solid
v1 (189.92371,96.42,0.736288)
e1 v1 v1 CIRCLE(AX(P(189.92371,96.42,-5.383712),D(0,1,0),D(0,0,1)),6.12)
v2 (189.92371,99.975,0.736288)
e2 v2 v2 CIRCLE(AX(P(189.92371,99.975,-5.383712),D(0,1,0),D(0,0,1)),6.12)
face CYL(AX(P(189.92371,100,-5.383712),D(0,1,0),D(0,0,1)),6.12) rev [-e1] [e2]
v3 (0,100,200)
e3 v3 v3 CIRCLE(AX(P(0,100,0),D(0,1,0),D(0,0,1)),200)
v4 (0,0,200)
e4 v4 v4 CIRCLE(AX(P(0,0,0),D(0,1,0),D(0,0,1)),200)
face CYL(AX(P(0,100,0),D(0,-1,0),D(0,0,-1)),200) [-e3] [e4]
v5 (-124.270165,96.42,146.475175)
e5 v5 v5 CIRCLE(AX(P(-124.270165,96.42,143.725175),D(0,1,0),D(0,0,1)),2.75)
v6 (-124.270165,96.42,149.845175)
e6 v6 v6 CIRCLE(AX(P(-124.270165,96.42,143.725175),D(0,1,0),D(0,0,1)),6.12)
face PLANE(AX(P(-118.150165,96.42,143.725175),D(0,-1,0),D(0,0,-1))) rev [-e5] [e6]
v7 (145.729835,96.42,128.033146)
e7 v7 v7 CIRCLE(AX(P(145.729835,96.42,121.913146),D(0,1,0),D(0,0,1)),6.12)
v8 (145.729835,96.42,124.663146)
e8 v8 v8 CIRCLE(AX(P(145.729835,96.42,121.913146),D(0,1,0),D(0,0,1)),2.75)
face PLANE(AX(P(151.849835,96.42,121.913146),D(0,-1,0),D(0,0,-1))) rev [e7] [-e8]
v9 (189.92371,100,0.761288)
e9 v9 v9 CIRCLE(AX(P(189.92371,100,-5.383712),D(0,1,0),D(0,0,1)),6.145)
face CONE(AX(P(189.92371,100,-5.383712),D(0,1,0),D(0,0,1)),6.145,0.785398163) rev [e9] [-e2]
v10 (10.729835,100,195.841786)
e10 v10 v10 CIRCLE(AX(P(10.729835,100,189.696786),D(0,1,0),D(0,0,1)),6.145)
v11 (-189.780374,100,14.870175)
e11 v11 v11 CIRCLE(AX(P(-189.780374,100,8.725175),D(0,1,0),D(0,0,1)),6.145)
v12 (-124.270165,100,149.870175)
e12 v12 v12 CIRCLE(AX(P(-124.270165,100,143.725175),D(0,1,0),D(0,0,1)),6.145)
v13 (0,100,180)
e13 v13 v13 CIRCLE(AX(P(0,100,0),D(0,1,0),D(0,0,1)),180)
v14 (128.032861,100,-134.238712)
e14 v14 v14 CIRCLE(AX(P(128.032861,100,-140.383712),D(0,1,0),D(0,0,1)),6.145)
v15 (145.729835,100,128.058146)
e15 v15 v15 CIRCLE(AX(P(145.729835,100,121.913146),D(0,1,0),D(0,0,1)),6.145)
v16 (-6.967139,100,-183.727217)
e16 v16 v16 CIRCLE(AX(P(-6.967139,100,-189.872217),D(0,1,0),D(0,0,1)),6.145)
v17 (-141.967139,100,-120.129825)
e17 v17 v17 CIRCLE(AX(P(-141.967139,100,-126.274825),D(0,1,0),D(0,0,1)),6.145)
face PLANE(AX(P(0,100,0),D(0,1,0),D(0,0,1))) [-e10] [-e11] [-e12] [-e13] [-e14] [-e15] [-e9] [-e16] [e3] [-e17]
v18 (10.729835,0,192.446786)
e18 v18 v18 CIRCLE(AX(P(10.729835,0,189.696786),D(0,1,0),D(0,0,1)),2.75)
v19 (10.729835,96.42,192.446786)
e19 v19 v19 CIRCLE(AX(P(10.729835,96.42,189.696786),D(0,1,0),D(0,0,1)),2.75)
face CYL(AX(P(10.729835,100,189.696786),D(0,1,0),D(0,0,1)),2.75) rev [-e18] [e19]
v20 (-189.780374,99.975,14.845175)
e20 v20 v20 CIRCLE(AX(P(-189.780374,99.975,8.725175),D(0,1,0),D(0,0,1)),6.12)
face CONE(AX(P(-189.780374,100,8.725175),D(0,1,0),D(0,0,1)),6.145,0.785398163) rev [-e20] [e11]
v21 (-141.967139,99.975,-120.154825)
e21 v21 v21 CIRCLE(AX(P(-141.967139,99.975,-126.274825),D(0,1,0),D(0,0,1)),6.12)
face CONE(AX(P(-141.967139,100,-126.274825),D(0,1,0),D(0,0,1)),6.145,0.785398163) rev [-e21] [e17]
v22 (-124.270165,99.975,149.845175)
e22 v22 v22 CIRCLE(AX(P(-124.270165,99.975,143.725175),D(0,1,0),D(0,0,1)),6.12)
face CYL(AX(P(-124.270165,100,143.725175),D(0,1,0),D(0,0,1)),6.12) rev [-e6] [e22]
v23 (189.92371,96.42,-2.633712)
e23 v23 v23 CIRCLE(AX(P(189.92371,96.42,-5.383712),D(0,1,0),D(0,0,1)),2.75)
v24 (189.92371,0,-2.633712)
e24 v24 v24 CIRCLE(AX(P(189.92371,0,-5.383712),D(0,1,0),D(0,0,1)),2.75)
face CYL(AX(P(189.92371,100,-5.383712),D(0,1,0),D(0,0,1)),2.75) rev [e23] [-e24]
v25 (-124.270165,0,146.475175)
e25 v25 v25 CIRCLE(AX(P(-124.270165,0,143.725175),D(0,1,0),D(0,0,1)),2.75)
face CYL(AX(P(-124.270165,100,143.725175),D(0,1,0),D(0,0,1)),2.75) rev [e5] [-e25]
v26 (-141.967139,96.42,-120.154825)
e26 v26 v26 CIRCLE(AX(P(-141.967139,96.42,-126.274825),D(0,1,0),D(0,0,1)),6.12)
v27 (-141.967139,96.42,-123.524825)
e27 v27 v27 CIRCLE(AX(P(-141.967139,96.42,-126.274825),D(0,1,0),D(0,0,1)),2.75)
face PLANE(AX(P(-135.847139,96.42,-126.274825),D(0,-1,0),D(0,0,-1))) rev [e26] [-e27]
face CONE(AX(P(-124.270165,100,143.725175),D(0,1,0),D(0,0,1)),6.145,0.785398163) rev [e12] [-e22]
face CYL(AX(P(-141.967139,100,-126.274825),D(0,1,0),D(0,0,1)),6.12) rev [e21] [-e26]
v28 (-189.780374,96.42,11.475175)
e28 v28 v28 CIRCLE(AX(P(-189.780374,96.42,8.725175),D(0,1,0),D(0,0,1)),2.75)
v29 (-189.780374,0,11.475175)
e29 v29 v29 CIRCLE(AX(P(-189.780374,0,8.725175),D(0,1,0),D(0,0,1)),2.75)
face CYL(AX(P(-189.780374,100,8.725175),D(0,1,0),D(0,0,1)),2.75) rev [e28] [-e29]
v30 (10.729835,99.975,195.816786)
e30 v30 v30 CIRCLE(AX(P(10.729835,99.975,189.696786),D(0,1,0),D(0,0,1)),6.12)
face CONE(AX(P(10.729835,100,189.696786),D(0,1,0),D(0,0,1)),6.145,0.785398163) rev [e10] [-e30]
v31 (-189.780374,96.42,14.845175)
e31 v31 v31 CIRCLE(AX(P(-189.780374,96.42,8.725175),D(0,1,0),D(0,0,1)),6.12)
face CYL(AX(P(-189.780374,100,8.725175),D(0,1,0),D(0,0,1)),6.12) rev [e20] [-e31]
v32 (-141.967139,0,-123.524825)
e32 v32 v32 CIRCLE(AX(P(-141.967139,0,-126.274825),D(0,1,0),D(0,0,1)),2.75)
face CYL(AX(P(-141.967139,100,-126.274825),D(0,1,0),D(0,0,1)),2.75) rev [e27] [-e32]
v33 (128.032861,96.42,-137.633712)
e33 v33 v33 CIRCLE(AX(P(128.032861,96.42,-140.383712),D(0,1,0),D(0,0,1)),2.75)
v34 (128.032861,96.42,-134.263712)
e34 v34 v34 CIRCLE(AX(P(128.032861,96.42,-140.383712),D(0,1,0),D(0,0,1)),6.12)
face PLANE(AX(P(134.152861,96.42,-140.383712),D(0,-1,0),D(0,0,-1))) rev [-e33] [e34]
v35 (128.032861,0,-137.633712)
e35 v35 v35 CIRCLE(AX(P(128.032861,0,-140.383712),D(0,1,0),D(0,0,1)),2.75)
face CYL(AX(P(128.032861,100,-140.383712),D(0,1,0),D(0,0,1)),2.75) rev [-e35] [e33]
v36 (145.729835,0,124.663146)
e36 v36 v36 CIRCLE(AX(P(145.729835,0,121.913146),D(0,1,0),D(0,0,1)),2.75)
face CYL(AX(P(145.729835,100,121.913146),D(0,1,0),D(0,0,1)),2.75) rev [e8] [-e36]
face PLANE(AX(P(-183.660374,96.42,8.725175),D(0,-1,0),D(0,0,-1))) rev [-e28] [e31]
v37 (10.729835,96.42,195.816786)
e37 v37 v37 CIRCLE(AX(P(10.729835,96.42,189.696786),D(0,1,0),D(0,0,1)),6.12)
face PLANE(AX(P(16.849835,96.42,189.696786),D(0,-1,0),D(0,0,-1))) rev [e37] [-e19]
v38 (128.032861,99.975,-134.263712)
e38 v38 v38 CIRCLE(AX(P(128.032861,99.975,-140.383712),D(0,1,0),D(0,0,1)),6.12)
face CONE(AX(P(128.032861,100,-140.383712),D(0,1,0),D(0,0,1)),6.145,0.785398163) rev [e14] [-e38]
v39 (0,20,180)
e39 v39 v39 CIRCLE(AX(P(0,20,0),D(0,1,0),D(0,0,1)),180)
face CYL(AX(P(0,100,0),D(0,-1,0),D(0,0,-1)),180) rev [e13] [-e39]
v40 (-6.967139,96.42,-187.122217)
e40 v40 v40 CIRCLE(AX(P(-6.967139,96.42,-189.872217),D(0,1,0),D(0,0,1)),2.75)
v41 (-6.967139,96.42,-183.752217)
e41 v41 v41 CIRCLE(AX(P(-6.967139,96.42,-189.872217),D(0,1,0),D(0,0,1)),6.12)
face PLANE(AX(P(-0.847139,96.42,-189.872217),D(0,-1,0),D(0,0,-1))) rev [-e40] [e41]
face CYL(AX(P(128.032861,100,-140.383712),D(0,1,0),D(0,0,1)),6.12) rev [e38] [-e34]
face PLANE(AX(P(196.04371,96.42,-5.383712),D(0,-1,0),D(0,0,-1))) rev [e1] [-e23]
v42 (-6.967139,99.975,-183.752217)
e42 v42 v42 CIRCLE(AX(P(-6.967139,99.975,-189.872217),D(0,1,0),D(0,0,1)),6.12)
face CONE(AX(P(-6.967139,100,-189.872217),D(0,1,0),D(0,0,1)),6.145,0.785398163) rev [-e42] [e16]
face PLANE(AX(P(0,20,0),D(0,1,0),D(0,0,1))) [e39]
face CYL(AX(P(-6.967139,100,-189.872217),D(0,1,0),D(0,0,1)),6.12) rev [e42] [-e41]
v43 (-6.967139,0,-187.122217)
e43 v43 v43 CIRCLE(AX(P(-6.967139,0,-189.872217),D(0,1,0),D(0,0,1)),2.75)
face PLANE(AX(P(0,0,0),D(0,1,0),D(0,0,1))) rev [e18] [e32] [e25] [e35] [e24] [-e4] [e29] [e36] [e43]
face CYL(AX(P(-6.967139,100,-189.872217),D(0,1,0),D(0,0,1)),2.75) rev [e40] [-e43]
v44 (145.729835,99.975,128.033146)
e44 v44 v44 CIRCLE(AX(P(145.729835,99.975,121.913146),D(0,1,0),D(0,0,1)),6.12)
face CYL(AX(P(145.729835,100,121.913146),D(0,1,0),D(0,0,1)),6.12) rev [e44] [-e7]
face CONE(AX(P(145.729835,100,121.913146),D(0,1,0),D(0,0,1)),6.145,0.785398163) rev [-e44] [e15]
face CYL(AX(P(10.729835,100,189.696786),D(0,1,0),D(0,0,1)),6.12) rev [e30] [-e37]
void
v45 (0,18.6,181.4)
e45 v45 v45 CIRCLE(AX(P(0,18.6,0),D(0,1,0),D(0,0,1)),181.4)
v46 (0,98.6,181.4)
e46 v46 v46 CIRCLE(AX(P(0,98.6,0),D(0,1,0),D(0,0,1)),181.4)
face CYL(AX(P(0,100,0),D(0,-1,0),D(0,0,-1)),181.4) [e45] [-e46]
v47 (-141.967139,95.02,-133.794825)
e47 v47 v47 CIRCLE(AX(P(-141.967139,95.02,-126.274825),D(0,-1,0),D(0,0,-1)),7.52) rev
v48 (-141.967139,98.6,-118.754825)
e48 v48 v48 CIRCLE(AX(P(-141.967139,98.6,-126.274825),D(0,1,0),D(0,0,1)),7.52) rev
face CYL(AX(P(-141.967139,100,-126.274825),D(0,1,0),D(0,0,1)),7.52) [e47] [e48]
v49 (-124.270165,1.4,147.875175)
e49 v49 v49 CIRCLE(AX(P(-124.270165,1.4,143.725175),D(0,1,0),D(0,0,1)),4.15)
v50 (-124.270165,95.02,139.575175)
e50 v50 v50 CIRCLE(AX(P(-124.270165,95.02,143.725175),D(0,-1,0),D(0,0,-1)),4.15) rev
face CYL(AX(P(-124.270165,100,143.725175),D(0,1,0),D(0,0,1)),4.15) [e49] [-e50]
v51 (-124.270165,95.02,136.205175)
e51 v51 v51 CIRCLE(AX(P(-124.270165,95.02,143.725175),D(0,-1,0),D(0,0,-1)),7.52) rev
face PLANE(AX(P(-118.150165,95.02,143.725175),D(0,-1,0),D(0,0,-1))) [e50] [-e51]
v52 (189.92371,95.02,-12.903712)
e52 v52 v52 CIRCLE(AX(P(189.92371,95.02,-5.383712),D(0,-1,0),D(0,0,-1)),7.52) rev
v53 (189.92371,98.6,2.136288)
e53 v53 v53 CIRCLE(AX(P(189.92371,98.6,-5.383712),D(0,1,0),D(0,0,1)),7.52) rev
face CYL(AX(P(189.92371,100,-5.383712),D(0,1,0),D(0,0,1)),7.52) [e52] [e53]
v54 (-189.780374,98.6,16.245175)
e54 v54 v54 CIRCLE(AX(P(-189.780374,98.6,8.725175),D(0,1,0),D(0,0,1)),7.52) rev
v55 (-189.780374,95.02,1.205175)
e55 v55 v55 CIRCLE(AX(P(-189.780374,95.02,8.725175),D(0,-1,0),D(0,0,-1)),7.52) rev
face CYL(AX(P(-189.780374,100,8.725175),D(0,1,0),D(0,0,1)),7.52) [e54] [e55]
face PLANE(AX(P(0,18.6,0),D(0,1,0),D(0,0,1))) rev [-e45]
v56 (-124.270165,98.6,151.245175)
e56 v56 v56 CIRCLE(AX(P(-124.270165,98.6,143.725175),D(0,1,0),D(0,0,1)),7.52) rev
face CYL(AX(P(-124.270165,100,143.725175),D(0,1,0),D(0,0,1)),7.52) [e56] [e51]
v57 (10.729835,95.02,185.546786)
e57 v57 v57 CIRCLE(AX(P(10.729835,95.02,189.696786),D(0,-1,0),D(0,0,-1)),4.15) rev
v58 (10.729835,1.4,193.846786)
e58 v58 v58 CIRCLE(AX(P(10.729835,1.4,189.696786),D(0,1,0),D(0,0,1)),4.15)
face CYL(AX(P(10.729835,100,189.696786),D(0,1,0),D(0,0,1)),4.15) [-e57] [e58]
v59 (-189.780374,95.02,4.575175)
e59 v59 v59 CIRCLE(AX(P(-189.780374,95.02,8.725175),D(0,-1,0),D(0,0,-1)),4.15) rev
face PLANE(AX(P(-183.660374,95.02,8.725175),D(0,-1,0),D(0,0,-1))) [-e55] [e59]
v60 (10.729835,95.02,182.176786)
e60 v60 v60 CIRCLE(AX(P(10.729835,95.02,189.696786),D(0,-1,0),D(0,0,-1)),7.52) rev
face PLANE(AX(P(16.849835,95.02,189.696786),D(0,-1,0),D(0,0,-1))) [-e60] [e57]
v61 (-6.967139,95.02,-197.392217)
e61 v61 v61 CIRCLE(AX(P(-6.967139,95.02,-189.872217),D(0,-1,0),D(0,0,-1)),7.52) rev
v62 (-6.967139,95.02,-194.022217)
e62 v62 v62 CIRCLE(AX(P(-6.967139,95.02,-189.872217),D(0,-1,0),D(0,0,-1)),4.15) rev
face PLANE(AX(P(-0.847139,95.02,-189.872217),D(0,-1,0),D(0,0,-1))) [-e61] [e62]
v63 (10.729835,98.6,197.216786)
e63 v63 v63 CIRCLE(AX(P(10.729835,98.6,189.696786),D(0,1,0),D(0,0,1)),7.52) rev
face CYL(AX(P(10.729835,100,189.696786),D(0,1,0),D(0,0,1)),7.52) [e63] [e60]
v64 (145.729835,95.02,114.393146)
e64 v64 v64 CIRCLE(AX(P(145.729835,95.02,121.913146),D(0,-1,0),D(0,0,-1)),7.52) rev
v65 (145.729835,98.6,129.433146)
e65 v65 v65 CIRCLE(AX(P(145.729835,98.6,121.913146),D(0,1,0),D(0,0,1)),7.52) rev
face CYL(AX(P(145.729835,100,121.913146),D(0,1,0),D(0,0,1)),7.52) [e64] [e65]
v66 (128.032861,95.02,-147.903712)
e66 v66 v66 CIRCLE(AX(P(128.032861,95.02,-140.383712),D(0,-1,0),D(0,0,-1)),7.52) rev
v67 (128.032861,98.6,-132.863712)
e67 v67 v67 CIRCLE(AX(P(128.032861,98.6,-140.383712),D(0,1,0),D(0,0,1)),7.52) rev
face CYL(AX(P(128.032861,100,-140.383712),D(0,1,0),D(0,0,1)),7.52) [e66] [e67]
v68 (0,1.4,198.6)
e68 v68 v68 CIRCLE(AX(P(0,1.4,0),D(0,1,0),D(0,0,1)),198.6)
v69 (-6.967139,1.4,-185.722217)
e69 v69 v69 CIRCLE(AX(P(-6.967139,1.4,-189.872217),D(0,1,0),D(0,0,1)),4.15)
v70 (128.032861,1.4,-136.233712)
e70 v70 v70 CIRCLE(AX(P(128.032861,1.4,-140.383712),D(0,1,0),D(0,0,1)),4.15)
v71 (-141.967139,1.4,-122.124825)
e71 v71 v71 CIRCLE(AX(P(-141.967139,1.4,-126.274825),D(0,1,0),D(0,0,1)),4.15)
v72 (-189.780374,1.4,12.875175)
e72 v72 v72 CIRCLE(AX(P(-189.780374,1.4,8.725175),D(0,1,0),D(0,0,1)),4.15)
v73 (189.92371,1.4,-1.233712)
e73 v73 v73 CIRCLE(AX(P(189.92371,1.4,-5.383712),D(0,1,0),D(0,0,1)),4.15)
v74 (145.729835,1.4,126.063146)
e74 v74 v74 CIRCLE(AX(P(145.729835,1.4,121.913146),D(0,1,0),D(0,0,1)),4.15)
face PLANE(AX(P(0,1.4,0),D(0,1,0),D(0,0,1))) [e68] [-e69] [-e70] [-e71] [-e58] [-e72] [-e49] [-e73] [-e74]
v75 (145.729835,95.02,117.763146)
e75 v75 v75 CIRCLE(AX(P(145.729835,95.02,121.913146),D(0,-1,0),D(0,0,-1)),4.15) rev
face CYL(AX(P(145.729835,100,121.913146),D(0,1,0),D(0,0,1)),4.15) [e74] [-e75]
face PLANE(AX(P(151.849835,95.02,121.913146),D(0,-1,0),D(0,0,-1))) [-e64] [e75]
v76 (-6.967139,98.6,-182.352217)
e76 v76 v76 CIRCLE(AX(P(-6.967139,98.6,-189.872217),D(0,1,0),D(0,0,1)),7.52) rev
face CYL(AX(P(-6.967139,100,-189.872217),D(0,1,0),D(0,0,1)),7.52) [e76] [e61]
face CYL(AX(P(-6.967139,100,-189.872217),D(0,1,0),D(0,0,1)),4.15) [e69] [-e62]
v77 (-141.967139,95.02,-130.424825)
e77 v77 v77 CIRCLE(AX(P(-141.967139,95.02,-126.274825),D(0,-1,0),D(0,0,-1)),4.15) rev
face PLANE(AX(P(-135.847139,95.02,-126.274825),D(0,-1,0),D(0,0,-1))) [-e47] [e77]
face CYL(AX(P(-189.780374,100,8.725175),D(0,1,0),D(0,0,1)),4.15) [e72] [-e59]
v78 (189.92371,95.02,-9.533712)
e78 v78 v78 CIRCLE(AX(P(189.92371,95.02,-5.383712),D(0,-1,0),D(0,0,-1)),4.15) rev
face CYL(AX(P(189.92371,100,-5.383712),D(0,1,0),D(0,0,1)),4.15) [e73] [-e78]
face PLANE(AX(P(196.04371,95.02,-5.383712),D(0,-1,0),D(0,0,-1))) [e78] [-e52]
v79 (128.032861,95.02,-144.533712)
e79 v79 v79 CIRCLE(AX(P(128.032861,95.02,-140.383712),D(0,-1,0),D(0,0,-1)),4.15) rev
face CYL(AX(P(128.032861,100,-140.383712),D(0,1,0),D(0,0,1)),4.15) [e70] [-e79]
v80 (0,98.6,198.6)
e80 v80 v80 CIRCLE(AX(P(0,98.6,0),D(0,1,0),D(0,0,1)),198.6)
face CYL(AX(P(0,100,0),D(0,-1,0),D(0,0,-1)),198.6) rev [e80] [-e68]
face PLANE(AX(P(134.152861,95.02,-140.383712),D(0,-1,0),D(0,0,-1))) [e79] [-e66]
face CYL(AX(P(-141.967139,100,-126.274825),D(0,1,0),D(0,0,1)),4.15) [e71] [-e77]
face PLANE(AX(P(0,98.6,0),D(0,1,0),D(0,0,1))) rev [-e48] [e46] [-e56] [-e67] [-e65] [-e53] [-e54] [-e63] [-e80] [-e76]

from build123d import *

# Parameters (mm, degrees)
SKETCH1_R                              = 200
BOSS_EXTRUDE1_DEPTH                    = 100
SHELL1_T                               = -20
CBORE_FOR_M5_HEX_HEAD_BOLT2_AT_2_COUNT = 2
CBORE_FOR_M5_HEX_HEAD_BOLT2_AT_2_PITCH = 269.81848572
CBORE_FOR_M5_HEX_HEAD_BOLT2_AT_3_COUNT = 2
CBORE_FOR_M5_HEX_HEAD_BOLT2_AT_3_PITCH = 269.928885586
CBORE_FOR_M5_HEX_HEAD_BOLT2_AT_4_COUNT = 2
CBORE_FOR_M5_HEX_HEAD_BOLT2_AT_4_PITCH = 379.981330262
CBORE_FOR_M5_HEX_HEAD_BOLT2_AT_5_COUNT = 2
CBORE_FOR_M5_HEX_HEAD_BOLT2_AT_5_PITCH = 347.169236891
CBORE_FOR_M5_HEX_HEAD_BOLT2_AT_6_COUNT = 2
CBORE_FOR_M5_HEX_HEAD_BOLT2_AT_6_PITCH = 143.784951156
CBORE_FOR_M5_HEX_HEAD_BOLT2_AT_7_COUNT = 2
CBORE_FOR_M5_HEX_HEAD_BOLT2_AT_7_PITCH = 353.620163975
CBORE_FOR_M5_HEX_HEAD_BOLT2_AT_8_COUNT = 2
CBORE_FOR_M5_HEX_HEAD_BOLT2_AT_8_PITCH = 149.23011883
SHELL5_START                           = 1.4
SHELL5_OUTLINE_R                       = 198.6
SHELL5_OUTLINE_R_2                     = 4.15
SHELL5_DEPTH                           = 17.2
SHELL5_START_2                         = 18.6
SHELL5_2_OUTLINE_R                     = 198.6
SHELL5_2_OUTLINE_R_2                   = 181.4
SHELL5_2_OUTLINE_R_3                   = 4.15
SHELL5_2_DEPTH                         = 76.42
SHELL5_START_3                         = 95.02
SHELL5_3_OUTLINE_R                     = 198.6
SHELL5_3_OUTLINE_R_2                   = 7.52
SHELL5_3_OUTLINE_R_3                   = 181.4
SHELL5_3_DEPTH                         = 3.58


# Read off the part's stored shape, not the designer's step: Shell5
with BuildPart() as part:
    # Sketch1 → Boss-Extrude1 (new body)
    with BuildSketch(Plane(origin=(0, 0, 0), x_dir=(1, 0, 0), z_dir=(0, 1, 0))):
        with Locations(Location((0, 0, 0), (0, 0, 270))):
            Circle(SKETCH1_R)
    extrude(amount=BOSS_EXTRUDE1_DEPTH)

    # Shell1
    shell1_openings = [part.faces().sort_by_distance(p)[0] for p in [
        (0, 100, 0),
    ]]
    offset(amount=SHELL1_T, openings=shell1_openings, kind=Kind.INTERSECTION)

    # Sketch8 → CBORE for M5 Hex Head Bolt2 (revolve, cut)
    with BuildSketch(Plane(origin=(-6.967139306, 100, -189.872217478), x_dir=(0, 0, 1), z_dir=(1, 0, 0))):
        Polygon((0, 0), (0, 100), (2.75, 100), (2.75, 3.58), (6.12, 3.58), (6.12, 0.025), (6.145, 0), align=None)
    cbore_for_m5_hex_head_bolt2 = revolve(axis=Axis((-6.967139306, 106.35, -189.872217478), (0, -1, 0)), mode=Mode.SUBTRACT)

    # CBORE for M5 Hex Head Bolt2 at 2: CBORE for M5 Hex Head Bolt2 ×2
    with Locations(*[Vector(0.7297159379092503, 0, 0.6837504295875969) * (i * CBORE_FOR_M5_HEX_HEAD_BOLT2_AT_2_PITCH) for i in range(1, CBORE_FOR_M5_HEX_HEAD_BOLT2_AT_2_COUNT)]):
        add(cbore_for_m5_hex_head_bolt2, mode=Mode.SUBTRACT)

    # CBORE for M5 Hex Head Bolt2 at 3: CBORE for M5 Hex Head Bolt2 ×2
    with Locations(*[Vector(-0.677264437721292, 0, 0.735739683174737) * (i * CBORE_FOR_M5_HEX_HEAD_BOLT2_AT_3_PITCH) for i in range(1, CBORE_FOR_M5_HEX_HEAD_BOLT2_AT_3_COUNT)]):
        add(cbore_for_m5_hex_head_bolt2, mode=Mode.SUBTRACT)

    # CBORE for M5 Hex Head Bolt2 at 4: CBORE for M5 Hex Head Bolt2 ×2
    with Locations(*[Vector(0.04657327234646247, 0, 0.9989148764048628) * (i * CBORE_FOR_M5_HEX_HEAD_BOLT2_AT_4_PITCH) for i in range(1, CBORE_FOR_M5_HEX_HEAD_BOLT2_AT_4_COUNT)]):
        add(cbore_for_m5_hex_head_bolt2, mode=Mode.SUBTRACT)

    # CBORE for M5 Hex Head Bolt2 at 5: CBORE for M5 Hex Head Bolt2 ×2
    with Locations(*[Vector(0.43983440280673813, 0, 0.8980788930309186) * (i * CBORE_FOR_M5_HEX_HEAD_BOLT2_AT_5_PITCH) for i in range(1, CBORE_FOR_M5_HEX_HEAD_BOLT2_AT_5_COUNT)]):
        add(cbore_for_m5_hex_head_bolt2, mode=Mode.SUBTRACT)

    # CBORE for M5 Hex Head Bolt2 at 6: CBORE for M5 Hex Head Bolt2 ×2
    with Locations(*[Vector(0.9389021515469056, 0, 0.344184180084721) * (i * CBORE_FOR_M5_HEX_HEAD_BOLT2_AT_6_PITCH) for i in range(1, CBORE_FOR_M5_HEX_HEAD_BOLT2_AT_6_COUNT)]):
        add(cbore_for_m5_hex_head_bolt2, mode=Mode.SUBTRACT)

    # CBORE for M5 Hex Head Bolt2 at 7: CBORE for M5 Hex Head Bolt2 ×2
    with Locations(*[Vector(-0.33172041068151087, 0, 0.943377744669276) * (i * CBORE_FOR_M5_HEX_HEAD_BOLT2_AT_7_PITCH) for i in range(1, CBORE_FOR_M5_HEX_HEAD_BOLT2_AT_7_COUNT)]):
        add(cbore_for_m5_hex_head_bolt2, mode=Mode.SUBTRACT)

    # CBORE for M5 Hex Head Bolt2 at 8: CBORE for M5 Hex Head Bolt2 ×2
    with Locations(*[Vector(-0.9046431180155808, 0, 0.4261699532194262) * (i * CBORE_FOR_M5_HEX_HEAD_BOLT2_AT_8_PITCH) for i in range(1, CBORE_FOR_M5_HEX_HEAD_BOLT2_AT_8_COUNT)]):
        add(cbore_for_m5_hex_head_bolt2, mode=Mode.SUBTRACT)

    # Shell5 outline → Shell5 (cut)
    with BuildSketch(Plane(origin=(0, 0, 0), x_dir=(1, 0, 0), z_dir=(0, 1, 0)).offset(SHELL5_START)):
        Circle(SHELL5_OUTLINE_R)
        with Locations((-124.270165325, -143.725175283)):
            Circle(SHELL5_OUTLINE_R_2, mode=Mode.SUBTRACT)
        with Locations((-189.780374227, -8.725175283)):
            Circle(SHELL5_OUTLINE_R_2, mode=Mode.SUBTRACT)
        with Locations((10.729834675, -189.696786077)):
            Circle(SHELL5_OUTLINE_R_2, mode=Mode.SUBTRACT)
        with Locations((145.729834675, -121.913146484)):
            Circle(SHELL5_OUTLINE_R_2, mode=Mode.SUBTRACT)
        with Locations((-141.967139306, 126.274824717)):
            Circle(SHELL5_OUTLINE_R_2, mode=Mode.SUBTRACT)
        with Locations((-6.967139306, 189.872217478)):
            Circle(SHELL5_OUTLINE_R_2, mode=Mode.SUBTRACT)
        with Locations((189.923710067, 5.383711956)):
            Circle(SHELL5_OUTLINE_R_2, mode=Mode.SUBTRACT)
        with Locations((128.032860694, 140.383711956)):
            Circle(SHELL5_OUTLINE_R_2, mode=Mode.SUBTRACT)
    extrude(amount=SHELL5_DEPTH, mode=Mode.SUBTRACT)

    # Shell5 2 outline → Shell5 2 (cut)
    with BuildSketch(Plane(origin=(0, 0, 0), x_dir=(1, 0, 0), z_dir=(0, 1, 0)).offset(SHELL5_START_2)):
        Circle(SHELL5_2_OUTLINE_R)
        Circle(SHELL5_2_OUTLINE_R_2, mode=Mode.SUBTRACT)
        with Locations((-124.270165325, -143.725175283)):
            Circle(SHELL5_2_OUTLINE_R_3, mode=Mode.SUBTRACT)
        with Locations((-189.780374227, -8.725175283)):
            Circle(SHELL5_2_OUTLINE_R_3, mode=Mode.SUBTRACT)
        with Locations((10.729834675, -189.696786077)):
            Circle(SHELL5_2_OUTLINE_R_3, mode=Mode.SUBTRACT)
        with Locations((145.729834675, -121.913146484)):
            Circle(SHELL5_2_OUTLINE_R_3, mode=Mode.SUBTRACT)
        with Locations((-141.967139306, 126.274824717)):
            Circle(SHELL5_2_OUTLINE_R_3, mode=Mode.SUBTRACT)
        with Locations((-6.967139306, 189.872217478)):
            Circle(SHELL5_2_OUTLINE_R_3, mode=Mode.SUBTRACT)
        with Locations((189.923710067, 5.383711956)):
            Circle(SHELL5_2_OUTLINE_R_3, mode=Mode.SUBTRACT)
        with Locations((128.032860694, 140.383711956)):
            Circle(SHELL5_2_OUTLINE_R_3, mode=Mode.SUBTRACT)
    extrude(amount=SHELL5_2_DEPTH, mode=Mode.SUBTRACT)

    # Shell5 3 outline → Shell5 3 (cut)
    with BuildSketch(Plane(origin=(0, 0, 0), x_dir=(1, 0, 0), z_dir=(0, 1, 0)).offset(SHELL5_START_3)):
        Circle(SHELL5_3_OUTLINE_R)
        with Locations((-124.270165325, -143.725175283)):
            Circle(SHELL5_3_OUTLINE_R_2, mode=Mode.SUBTRACT)
        with Locations((-189.780374227, -8.725175283)):
            Circle(SHELL5_3_OUTLINE_R_2, mode=Mode.SUBTRACT)
        with Locations((10.729834675, -189.696786077)):
            Circle(SHELL5_3_OUTLINE_R_2, mode=Mode.SUBTRACT)
        with Locations((145.729834675, -121.913146484)):
            Circle(SHELL5_3_OUTLINE_R_2, mode=Mode.SUBTRACT)
        with Locations((-141.967139306, 126.274824717)):
            Circle(SHELL5_3_OUTLINE_R_2, mode=Mode.SUBTRACT)
        with Locations((-6.967139306, 189.872217478)):
            Circle(SHELL5_3_OUTLINE_R_2, mode=Mode.SUBTRACT)
        Circle(SHELL5_3_OUTLINE_R_3, mode=Mode.SUBTRACT)
        with Locations((189.923710067, 5.383711956)):
            Circle(SHELL5_3_OUTLINE_R_2, mode=Mode.SUBTRACT)
        with Locations((128.032860694, 140.383711956)):
            Circle(SHELL5_3_OUTLINE_R_2, mode=Mode.SUBTRACT)
    extrude(amount=SHELL5_3_DEPTH, mode=Mode.SUBTRACT)


solid = part.part
